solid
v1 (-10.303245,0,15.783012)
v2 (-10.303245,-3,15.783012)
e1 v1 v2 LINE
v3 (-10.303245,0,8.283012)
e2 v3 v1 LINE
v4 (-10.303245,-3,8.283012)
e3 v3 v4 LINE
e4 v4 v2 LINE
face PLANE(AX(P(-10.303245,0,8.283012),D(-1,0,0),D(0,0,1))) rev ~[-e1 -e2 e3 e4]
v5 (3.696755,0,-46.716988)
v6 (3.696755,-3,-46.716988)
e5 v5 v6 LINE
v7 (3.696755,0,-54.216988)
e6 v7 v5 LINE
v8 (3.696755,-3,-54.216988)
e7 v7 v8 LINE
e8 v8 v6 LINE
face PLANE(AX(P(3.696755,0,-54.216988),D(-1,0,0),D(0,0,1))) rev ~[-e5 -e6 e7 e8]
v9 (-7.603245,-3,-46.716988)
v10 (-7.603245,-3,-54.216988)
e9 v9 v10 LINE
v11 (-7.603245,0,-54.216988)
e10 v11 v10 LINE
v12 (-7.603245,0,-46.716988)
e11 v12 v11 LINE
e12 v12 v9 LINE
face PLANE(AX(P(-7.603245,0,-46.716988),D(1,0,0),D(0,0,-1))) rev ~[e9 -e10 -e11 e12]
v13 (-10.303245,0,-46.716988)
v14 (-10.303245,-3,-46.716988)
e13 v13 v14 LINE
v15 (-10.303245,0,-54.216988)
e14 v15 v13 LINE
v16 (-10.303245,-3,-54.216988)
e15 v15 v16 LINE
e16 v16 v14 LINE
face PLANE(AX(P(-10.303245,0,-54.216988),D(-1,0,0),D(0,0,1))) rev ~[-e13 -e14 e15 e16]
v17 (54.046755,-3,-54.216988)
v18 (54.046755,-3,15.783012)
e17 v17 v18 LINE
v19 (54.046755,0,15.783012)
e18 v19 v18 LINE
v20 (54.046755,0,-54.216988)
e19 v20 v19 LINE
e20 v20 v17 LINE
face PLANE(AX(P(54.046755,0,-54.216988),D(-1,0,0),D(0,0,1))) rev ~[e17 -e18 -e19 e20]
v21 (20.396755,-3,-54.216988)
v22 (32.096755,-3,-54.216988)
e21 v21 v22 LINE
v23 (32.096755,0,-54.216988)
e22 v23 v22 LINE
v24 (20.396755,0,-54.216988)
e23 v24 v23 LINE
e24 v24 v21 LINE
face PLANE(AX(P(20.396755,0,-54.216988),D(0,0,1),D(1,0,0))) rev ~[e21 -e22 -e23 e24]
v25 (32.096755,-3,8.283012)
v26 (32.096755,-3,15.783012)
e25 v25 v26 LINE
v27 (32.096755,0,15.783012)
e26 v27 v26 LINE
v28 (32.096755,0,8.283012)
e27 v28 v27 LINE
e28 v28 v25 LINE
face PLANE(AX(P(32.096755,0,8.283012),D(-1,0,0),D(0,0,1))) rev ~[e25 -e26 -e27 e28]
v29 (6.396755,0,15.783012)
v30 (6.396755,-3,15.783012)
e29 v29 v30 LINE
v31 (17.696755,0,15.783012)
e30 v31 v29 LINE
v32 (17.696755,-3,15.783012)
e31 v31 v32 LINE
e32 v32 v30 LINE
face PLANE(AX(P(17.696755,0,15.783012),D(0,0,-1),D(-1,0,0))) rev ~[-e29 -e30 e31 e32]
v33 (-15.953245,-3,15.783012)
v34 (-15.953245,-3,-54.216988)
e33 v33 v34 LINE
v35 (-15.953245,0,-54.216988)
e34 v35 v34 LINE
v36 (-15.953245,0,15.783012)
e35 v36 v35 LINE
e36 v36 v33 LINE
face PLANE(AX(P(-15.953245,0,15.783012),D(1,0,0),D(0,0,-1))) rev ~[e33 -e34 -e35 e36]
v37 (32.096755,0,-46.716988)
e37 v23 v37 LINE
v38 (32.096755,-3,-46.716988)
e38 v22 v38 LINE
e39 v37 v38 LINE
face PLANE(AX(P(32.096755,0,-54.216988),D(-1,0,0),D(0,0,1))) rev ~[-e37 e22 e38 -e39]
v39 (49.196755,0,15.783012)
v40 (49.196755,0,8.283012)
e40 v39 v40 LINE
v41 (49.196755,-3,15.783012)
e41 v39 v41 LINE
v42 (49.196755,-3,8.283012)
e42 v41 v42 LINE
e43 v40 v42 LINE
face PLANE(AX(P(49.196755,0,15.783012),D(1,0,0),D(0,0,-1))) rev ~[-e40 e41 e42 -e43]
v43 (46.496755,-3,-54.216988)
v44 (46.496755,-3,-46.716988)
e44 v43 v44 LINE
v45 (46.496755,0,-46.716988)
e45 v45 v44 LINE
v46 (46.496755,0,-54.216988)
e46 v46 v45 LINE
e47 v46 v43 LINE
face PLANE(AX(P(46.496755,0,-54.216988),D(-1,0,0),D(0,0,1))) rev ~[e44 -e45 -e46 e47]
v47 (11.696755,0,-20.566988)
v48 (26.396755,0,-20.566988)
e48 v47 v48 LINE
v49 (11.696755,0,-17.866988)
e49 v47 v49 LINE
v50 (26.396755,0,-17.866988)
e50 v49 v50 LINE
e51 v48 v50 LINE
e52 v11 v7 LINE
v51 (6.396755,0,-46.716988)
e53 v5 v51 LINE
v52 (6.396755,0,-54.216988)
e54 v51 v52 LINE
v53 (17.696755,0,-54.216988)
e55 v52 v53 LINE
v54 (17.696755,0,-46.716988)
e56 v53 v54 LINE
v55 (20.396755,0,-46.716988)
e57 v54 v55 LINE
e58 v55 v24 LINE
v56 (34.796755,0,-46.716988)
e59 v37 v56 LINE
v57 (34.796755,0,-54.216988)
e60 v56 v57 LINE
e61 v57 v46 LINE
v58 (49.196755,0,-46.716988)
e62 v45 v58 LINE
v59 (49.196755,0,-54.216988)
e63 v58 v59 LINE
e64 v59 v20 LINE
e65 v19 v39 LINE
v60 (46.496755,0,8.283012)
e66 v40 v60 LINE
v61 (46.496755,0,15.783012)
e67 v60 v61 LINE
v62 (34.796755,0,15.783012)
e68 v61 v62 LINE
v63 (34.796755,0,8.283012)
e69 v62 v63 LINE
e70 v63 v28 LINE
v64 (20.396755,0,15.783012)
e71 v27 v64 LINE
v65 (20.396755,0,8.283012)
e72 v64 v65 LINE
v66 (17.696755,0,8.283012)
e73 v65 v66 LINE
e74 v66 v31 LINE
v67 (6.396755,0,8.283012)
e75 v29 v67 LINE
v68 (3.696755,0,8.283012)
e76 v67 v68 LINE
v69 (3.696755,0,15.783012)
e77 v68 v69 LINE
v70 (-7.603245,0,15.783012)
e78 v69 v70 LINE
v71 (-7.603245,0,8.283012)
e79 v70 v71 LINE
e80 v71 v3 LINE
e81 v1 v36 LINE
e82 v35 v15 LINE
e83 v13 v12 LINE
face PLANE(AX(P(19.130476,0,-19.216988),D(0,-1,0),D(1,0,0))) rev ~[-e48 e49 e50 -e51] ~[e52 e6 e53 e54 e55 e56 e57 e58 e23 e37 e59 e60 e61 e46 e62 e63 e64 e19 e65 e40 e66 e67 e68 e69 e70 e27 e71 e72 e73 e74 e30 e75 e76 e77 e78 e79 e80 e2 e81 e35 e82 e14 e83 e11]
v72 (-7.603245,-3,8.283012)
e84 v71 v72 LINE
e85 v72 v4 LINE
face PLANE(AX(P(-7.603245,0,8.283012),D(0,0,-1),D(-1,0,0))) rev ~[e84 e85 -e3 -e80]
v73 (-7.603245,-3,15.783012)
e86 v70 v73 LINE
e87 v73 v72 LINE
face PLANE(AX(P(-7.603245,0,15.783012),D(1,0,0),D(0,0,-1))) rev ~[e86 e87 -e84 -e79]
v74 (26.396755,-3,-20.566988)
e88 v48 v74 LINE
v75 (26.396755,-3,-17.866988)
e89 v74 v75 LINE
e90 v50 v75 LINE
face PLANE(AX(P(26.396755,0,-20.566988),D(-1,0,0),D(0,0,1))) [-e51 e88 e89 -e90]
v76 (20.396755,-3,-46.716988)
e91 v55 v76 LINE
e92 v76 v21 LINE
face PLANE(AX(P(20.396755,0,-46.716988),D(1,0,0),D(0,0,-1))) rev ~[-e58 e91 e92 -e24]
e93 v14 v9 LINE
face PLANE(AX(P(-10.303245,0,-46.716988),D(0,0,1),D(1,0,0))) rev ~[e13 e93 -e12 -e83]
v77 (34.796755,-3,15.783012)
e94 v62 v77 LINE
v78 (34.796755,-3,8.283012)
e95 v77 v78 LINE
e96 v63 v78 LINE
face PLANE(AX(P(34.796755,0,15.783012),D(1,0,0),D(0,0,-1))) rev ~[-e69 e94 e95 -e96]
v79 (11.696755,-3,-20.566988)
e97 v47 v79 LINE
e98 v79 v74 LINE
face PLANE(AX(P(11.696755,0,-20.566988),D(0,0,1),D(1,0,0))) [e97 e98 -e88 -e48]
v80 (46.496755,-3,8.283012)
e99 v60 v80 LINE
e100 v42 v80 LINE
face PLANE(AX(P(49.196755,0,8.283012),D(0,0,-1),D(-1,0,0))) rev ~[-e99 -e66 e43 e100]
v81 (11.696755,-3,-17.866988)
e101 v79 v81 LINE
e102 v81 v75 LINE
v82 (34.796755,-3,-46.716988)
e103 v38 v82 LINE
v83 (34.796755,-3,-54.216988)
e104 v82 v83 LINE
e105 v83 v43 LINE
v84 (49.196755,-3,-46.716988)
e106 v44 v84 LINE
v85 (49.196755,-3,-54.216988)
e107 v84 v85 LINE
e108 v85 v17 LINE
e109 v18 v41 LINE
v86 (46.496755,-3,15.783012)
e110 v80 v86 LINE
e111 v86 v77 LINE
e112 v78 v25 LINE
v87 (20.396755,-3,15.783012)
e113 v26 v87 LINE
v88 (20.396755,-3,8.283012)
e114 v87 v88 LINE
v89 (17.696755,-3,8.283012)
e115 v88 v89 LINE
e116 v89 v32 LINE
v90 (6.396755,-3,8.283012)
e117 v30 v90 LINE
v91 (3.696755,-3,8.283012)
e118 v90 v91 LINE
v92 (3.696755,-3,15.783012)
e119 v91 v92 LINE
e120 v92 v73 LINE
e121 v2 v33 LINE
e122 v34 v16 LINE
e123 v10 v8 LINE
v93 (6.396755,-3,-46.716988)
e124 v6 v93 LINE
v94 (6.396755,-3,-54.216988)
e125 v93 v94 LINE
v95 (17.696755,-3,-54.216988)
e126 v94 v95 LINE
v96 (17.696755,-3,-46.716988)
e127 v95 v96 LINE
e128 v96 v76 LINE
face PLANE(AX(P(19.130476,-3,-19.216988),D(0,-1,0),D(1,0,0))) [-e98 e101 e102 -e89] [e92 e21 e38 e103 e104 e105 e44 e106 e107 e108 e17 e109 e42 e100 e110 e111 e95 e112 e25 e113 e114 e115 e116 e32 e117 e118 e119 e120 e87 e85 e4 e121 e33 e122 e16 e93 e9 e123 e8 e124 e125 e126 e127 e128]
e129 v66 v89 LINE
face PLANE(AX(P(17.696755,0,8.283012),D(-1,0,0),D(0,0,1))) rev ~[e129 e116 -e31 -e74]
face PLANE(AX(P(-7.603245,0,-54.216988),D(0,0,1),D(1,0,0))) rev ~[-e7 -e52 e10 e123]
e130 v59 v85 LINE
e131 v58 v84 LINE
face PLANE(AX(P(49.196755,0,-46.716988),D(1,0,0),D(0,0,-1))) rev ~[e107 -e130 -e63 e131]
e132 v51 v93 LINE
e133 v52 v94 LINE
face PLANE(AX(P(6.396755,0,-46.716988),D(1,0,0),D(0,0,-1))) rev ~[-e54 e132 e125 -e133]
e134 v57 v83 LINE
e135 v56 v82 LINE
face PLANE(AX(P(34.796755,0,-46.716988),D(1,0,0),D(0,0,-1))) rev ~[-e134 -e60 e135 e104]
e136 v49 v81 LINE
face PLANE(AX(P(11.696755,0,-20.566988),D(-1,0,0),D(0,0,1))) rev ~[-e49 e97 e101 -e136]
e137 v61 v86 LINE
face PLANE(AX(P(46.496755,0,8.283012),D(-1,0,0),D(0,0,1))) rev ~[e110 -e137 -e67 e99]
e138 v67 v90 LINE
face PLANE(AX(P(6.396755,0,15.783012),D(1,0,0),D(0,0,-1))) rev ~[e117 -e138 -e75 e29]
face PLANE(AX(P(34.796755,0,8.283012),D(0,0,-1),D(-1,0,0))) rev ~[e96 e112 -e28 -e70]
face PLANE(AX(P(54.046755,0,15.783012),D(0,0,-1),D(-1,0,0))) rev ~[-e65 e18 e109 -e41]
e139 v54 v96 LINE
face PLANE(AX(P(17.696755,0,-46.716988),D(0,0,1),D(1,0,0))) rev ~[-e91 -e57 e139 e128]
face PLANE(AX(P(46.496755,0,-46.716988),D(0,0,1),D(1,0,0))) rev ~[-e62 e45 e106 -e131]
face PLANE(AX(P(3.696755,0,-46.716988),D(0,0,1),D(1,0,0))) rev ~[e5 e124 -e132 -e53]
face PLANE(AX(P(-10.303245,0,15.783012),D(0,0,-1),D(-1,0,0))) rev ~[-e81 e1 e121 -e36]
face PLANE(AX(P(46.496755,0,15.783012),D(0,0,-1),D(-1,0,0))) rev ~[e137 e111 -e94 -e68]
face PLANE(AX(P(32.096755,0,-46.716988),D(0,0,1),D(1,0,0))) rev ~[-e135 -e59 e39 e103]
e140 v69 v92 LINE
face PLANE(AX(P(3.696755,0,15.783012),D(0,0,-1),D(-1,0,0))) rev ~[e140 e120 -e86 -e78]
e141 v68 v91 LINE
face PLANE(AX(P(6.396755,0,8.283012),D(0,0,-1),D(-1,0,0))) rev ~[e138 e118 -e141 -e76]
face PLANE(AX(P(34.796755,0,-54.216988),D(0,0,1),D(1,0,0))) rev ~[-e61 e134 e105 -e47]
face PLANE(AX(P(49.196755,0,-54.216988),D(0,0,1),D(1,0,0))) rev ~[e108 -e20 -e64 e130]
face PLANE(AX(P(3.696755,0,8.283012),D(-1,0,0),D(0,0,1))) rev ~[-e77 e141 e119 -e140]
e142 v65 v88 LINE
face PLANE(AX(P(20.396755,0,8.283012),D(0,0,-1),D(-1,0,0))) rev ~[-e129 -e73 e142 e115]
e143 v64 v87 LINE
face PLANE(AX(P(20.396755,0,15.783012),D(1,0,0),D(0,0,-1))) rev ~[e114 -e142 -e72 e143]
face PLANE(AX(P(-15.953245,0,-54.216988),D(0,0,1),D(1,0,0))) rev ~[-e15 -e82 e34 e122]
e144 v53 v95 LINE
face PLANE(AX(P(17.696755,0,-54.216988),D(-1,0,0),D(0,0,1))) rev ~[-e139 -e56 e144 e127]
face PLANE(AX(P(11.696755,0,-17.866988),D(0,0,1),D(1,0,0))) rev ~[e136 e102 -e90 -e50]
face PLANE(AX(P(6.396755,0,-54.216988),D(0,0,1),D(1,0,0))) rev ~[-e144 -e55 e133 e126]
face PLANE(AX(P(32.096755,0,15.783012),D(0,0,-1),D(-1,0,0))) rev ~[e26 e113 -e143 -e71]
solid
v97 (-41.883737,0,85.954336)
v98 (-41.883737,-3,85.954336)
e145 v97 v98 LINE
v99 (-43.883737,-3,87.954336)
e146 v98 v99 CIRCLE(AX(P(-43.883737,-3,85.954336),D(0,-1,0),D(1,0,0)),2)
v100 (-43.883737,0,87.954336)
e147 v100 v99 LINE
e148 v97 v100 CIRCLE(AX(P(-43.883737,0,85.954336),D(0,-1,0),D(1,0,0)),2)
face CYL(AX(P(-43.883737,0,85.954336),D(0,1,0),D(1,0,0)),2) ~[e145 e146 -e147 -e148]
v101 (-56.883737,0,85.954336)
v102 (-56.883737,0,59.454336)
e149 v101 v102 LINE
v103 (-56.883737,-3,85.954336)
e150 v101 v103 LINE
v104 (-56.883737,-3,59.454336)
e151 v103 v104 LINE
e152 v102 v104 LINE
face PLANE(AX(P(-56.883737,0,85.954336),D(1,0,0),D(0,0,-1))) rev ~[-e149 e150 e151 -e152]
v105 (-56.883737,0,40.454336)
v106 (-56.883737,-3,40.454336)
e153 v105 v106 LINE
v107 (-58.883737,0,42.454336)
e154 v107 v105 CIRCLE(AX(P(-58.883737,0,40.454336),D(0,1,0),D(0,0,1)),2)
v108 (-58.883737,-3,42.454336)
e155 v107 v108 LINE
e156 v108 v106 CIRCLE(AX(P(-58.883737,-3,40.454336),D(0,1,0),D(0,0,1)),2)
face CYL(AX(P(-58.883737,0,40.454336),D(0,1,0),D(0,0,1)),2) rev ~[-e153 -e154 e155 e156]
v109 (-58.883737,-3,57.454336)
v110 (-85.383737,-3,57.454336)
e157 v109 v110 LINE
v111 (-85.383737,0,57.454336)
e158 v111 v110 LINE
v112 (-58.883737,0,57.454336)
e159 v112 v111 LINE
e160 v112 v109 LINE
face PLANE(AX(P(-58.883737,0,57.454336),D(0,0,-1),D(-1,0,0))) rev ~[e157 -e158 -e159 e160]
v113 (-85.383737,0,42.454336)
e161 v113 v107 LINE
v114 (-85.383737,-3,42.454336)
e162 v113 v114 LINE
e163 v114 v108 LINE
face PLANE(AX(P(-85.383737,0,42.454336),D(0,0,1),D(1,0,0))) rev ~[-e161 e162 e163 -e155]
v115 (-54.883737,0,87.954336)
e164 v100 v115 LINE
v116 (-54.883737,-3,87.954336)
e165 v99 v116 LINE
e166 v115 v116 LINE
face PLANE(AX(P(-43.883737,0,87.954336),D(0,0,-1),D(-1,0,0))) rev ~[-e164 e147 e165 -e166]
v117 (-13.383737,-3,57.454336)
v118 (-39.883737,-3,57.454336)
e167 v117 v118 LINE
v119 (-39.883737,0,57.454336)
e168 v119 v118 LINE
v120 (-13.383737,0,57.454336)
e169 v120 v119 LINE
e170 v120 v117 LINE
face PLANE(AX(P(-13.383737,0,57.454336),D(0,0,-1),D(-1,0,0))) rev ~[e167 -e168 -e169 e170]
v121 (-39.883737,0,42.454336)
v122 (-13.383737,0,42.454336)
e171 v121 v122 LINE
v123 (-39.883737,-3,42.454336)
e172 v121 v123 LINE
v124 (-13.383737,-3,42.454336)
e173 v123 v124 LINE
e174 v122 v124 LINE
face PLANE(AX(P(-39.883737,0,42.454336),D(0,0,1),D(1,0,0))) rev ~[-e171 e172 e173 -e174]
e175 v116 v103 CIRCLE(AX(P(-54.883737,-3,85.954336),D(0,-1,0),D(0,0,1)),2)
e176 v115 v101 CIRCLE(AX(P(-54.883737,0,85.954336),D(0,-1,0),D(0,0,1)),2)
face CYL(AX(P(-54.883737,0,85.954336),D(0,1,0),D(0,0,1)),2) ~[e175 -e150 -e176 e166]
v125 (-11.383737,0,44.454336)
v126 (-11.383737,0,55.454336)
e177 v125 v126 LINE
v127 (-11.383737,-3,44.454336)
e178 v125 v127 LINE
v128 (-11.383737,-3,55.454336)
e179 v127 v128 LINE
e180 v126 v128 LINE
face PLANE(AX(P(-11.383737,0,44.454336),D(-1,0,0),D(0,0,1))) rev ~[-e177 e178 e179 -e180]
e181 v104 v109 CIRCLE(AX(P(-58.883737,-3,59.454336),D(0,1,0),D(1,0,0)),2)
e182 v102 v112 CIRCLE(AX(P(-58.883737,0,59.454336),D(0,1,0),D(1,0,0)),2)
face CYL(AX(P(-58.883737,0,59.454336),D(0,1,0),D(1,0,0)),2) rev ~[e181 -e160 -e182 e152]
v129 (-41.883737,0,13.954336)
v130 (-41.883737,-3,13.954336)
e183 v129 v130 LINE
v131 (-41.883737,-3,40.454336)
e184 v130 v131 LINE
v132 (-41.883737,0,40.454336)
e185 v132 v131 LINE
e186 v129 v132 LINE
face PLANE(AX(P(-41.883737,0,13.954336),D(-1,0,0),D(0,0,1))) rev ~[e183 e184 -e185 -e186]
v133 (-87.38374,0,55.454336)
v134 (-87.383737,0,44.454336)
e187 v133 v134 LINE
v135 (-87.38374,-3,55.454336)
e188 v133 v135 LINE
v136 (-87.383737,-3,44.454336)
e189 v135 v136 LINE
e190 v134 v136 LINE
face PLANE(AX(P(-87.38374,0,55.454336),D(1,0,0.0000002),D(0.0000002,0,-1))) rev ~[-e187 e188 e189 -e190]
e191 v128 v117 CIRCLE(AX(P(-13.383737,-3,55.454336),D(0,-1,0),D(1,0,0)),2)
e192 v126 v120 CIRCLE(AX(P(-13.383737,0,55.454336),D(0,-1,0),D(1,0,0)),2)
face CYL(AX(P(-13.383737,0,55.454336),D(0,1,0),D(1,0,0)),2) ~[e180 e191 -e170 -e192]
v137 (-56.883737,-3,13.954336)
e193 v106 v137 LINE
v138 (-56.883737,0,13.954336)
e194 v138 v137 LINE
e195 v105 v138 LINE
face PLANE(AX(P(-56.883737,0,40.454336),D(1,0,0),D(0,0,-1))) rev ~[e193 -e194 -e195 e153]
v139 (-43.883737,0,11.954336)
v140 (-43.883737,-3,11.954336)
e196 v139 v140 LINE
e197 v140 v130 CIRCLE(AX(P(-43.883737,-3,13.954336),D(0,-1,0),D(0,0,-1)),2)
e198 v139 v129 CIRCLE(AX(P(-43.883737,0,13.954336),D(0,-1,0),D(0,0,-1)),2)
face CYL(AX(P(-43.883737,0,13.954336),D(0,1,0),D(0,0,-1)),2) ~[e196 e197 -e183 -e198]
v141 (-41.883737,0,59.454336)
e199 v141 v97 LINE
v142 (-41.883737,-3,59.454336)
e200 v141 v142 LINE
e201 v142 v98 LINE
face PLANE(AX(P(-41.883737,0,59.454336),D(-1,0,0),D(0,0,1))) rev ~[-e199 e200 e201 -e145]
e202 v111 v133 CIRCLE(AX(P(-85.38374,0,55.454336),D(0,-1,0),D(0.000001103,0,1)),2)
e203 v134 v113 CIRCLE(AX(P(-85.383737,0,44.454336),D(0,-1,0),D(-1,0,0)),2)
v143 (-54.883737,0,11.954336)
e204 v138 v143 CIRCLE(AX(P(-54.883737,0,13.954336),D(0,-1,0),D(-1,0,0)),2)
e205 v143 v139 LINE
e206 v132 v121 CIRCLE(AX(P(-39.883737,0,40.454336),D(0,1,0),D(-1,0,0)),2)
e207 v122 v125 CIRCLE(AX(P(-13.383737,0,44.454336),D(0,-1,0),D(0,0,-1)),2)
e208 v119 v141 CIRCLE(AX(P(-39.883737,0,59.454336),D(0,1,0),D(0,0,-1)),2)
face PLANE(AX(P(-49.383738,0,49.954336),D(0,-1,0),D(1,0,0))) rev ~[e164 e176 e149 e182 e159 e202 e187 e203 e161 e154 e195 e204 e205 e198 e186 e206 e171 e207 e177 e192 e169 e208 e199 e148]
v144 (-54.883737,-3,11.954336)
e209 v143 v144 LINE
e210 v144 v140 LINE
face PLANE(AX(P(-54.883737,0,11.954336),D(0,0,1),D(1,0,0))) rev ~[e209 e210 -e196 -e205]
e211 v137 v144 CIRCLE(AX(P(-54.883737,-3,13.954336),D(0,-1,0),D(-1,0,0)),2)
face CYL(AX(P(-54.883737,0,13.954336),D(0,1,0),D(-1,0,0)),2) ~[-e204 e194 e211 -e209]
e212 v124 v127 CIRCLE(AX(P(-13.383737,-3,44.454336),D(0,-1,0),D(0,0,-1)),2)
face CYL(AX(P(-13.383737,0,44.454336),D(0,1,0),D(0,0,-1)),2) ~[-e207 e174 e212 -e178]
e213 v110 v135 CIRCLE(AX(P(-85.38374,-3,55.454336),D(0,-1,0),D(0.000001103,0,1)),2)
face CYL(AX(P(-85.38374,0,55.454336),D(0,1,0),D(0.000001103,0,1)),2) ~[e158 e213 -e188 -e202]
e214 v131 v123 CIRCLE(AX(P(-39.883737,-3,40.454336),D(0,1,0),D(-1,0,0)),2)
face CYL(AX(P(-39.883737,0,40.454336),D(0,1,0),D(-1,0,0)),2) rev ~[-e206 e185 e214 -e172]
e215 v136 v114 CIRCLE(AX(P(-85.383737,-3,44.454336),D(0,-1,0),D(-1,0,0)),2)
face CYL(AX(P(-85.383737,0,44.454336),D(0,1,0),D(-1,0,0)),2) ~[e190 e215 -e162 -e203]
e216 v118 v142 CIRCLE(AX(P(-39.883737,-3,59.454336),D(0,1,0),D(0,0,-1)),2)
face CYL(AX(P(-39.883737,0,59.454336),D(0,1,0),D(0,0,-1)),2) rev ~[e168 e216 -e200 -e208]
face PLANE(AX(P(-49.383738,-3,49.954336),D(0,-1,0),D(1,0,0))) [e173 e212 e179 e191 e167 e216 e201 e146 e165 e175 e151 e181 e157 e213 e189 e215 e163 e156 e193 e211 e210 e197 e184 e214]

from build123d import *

# Parameters (mm, degrees)
F1_DEPTH = 3
F2_W     = 14.7
F2_H     = 2.7
F3_DEPTH = 3


# Not quite as in the source:
# - ends of sketch curves that miss each other by under 0.0002 mm in the source are joined


with BuildPart() as f1:
    # F0 (on Front) → F1 (new body)
    with BuildSketch(Plane.XZ):
        with BuildLine():
            ThreePointArc((-56.8837374449, 13.9543364197), (-56.2979510073, 12.5401228573), (-54.8837374449, 11.9543364197))
            Line((-54.8837374449, 11.9543364197), (-43.8837374449, 11.9543364197))
            ThreePointArc((-43.8837374449, 11.9543364197), (-42.4695238825, 12.5401228573), (-41.8837374449, 13.9543364197))
            Line((-41.8837374449, 13.9543364197), (-41.8837374449, 40.4543364197))
            ThreePointArc((-41.8837374449, 40.4543364197), (-41.2979510073, 41.8685499821), (-39.8837374449, 42.4543364197))
            Line((-39.8837374449, 42.4543364197), (-13.3837374449, 42.4543364197))
            ThreePointArc((-13.3837374449, 42.4543364197), (-11.9695238825, 43.0401228573), (-11.3837374449, 44.4543364197))
            Line((-11.3837374449, 44.4543364197), (-11.3837374449, 55.4543364197))
            ThreePointArc((-11.3837374449, 55.4543364197), (-11.9695238825, 56.8685499821), (-13.3837374449, 57.4543364197))
            Line((-13.3837374449, 57.4543364197), (-39.8837374449, 57.4543364197))
            ThreePointArc((-39.8837374449, 57.4543364197), (-41.2979510073, 58.0401228573), (-41.8837374449, 59.4543364197))
            Line((-41.8837374449, 59.4543364197), (-41.8837374449, 85.9543364197))
            ThreePointArc((-41.8837374449, 85.9543364197), (-42.4695238825, 87.3685499821), (-43.8837374449, 87.9543364197))
            Line((-43.8837374449, 87.9543364197), (-54.8837374449, 87.9543364197))
            ThreePointArc((-54.8837374449, 87.9543364197), (-56.2979510073, 87.3685499821), (-56.8837374449, 85.9543364197))
            Line((-56.8837374449, 85.9543364197), (-56.8837374449, 59.4543364197))
            ThreePointArc((-56.8837374449, 59.4543364197), (-57.4695238825, 58.0401228573), (-58.8837374449, 57.4543364197))
            Line((-58.8837374449, 57.4543364197), (-85.3837374449, 57.4543364197))
            ThreePointArc((-85.3837374449, 57.4543364197), (-86.7979532126, 56.8685499821), (-87.3837396502, 55.4543364197))
            Line((-87.3837396502, 55.4543364197), (-87.3837374449, 44.4543364197))
            ThreePointArc((-87.3837374449, 44.4543364197), (-86.7979510073, 43.0401228573), (-85.3837374449, 42.4543364197))
            Line((-85.3837374449, 42.4543364197), (-58.8837374449, 42.4543364197))
            ThreePointArc((-58.8837374449, 42.4543364197), (-57.4695238825, 41.8685499821), (-56.8837374449, 40.4543364197))
            Line((-56.8837374449, 40.4543364197), (-56.8837374449, 13.9543364197))
        make_face()
    extrude(amount=F1_DEPTH)


with BuildPart() as f3:
    # F2 (on Front) → F3 (new body)
    with BuildSketch(Plane.XZ):
        Polygon((54.0467553358, -54.2169875913), (54.0467553358, 15.7830124087), (49.1967553358, 15.7830124087), (49.1967553358, 8.2830124087), (46.4967553358, 8.2830124087), (46.4967553358, 15.7830124087), (34.7967553358, 15.7830124087), (34.7967553358, 8.2830124087), (32.0967553358, 8.2830124087), (32.0967553358, 15.7830124087), (20.3967553358, 15.7830124087), (20.3967553358, 8.2830124087), (17.6967553358, 8.2830124087), (17.6967553358, 15.7830124087), (6.3967553358, 15.7830124087), (6.3967553358, 8.2830124087), (3.6967553358, 8.2830124087), (3.6967553358, 15.7830124087), (-7.6032446642, 15.7830124087), (-7.6032446642, 8.2830124087), (-10.3032446642, 8.2830124087), (-10.3032446642, 15.7830124087), (-15.9532446642, 15.7830124087), (-15.9532446642, -54.2169875913), (-10.3032446642, -54.2169875913), (-10.3032446642, -46.7169875913), (-7.6032446642, -46.7169875913), (-7.6032446642, -54.2169875913), (3.6967553358, -54.2169875913), (3.6967553358, -46.7169875913), (6.3967553358, -46.7169875913), (6.3967553358, -54.2169875913), (17.6967553358, -54.2169875913), (17.6967553358, -46.7169875913), (20.3967553358, -46.7169875913), (20.3967553358, -54.2169875913), (32.0967553358, -54.2169875913), (32.0967553358, -46.7169875913), (34.7967553358, -46.7169875913), (34.7967553358, -54.2169875913), (46.4967553358, -54.2169875913), (46.4967553358, -46.7169875913), (49.1967553358, -46.7169875913), (49.1967553358, -54.2169875913), align=None)
        with Locations((19.0467553358, -19.2169875913)):
            Rectangle(F2_W, F2_H, mode=Mode.SUBTRACT)
    extrude(amount=F3_DEPTH)


solid = Compound([f1.part, f3.part])
